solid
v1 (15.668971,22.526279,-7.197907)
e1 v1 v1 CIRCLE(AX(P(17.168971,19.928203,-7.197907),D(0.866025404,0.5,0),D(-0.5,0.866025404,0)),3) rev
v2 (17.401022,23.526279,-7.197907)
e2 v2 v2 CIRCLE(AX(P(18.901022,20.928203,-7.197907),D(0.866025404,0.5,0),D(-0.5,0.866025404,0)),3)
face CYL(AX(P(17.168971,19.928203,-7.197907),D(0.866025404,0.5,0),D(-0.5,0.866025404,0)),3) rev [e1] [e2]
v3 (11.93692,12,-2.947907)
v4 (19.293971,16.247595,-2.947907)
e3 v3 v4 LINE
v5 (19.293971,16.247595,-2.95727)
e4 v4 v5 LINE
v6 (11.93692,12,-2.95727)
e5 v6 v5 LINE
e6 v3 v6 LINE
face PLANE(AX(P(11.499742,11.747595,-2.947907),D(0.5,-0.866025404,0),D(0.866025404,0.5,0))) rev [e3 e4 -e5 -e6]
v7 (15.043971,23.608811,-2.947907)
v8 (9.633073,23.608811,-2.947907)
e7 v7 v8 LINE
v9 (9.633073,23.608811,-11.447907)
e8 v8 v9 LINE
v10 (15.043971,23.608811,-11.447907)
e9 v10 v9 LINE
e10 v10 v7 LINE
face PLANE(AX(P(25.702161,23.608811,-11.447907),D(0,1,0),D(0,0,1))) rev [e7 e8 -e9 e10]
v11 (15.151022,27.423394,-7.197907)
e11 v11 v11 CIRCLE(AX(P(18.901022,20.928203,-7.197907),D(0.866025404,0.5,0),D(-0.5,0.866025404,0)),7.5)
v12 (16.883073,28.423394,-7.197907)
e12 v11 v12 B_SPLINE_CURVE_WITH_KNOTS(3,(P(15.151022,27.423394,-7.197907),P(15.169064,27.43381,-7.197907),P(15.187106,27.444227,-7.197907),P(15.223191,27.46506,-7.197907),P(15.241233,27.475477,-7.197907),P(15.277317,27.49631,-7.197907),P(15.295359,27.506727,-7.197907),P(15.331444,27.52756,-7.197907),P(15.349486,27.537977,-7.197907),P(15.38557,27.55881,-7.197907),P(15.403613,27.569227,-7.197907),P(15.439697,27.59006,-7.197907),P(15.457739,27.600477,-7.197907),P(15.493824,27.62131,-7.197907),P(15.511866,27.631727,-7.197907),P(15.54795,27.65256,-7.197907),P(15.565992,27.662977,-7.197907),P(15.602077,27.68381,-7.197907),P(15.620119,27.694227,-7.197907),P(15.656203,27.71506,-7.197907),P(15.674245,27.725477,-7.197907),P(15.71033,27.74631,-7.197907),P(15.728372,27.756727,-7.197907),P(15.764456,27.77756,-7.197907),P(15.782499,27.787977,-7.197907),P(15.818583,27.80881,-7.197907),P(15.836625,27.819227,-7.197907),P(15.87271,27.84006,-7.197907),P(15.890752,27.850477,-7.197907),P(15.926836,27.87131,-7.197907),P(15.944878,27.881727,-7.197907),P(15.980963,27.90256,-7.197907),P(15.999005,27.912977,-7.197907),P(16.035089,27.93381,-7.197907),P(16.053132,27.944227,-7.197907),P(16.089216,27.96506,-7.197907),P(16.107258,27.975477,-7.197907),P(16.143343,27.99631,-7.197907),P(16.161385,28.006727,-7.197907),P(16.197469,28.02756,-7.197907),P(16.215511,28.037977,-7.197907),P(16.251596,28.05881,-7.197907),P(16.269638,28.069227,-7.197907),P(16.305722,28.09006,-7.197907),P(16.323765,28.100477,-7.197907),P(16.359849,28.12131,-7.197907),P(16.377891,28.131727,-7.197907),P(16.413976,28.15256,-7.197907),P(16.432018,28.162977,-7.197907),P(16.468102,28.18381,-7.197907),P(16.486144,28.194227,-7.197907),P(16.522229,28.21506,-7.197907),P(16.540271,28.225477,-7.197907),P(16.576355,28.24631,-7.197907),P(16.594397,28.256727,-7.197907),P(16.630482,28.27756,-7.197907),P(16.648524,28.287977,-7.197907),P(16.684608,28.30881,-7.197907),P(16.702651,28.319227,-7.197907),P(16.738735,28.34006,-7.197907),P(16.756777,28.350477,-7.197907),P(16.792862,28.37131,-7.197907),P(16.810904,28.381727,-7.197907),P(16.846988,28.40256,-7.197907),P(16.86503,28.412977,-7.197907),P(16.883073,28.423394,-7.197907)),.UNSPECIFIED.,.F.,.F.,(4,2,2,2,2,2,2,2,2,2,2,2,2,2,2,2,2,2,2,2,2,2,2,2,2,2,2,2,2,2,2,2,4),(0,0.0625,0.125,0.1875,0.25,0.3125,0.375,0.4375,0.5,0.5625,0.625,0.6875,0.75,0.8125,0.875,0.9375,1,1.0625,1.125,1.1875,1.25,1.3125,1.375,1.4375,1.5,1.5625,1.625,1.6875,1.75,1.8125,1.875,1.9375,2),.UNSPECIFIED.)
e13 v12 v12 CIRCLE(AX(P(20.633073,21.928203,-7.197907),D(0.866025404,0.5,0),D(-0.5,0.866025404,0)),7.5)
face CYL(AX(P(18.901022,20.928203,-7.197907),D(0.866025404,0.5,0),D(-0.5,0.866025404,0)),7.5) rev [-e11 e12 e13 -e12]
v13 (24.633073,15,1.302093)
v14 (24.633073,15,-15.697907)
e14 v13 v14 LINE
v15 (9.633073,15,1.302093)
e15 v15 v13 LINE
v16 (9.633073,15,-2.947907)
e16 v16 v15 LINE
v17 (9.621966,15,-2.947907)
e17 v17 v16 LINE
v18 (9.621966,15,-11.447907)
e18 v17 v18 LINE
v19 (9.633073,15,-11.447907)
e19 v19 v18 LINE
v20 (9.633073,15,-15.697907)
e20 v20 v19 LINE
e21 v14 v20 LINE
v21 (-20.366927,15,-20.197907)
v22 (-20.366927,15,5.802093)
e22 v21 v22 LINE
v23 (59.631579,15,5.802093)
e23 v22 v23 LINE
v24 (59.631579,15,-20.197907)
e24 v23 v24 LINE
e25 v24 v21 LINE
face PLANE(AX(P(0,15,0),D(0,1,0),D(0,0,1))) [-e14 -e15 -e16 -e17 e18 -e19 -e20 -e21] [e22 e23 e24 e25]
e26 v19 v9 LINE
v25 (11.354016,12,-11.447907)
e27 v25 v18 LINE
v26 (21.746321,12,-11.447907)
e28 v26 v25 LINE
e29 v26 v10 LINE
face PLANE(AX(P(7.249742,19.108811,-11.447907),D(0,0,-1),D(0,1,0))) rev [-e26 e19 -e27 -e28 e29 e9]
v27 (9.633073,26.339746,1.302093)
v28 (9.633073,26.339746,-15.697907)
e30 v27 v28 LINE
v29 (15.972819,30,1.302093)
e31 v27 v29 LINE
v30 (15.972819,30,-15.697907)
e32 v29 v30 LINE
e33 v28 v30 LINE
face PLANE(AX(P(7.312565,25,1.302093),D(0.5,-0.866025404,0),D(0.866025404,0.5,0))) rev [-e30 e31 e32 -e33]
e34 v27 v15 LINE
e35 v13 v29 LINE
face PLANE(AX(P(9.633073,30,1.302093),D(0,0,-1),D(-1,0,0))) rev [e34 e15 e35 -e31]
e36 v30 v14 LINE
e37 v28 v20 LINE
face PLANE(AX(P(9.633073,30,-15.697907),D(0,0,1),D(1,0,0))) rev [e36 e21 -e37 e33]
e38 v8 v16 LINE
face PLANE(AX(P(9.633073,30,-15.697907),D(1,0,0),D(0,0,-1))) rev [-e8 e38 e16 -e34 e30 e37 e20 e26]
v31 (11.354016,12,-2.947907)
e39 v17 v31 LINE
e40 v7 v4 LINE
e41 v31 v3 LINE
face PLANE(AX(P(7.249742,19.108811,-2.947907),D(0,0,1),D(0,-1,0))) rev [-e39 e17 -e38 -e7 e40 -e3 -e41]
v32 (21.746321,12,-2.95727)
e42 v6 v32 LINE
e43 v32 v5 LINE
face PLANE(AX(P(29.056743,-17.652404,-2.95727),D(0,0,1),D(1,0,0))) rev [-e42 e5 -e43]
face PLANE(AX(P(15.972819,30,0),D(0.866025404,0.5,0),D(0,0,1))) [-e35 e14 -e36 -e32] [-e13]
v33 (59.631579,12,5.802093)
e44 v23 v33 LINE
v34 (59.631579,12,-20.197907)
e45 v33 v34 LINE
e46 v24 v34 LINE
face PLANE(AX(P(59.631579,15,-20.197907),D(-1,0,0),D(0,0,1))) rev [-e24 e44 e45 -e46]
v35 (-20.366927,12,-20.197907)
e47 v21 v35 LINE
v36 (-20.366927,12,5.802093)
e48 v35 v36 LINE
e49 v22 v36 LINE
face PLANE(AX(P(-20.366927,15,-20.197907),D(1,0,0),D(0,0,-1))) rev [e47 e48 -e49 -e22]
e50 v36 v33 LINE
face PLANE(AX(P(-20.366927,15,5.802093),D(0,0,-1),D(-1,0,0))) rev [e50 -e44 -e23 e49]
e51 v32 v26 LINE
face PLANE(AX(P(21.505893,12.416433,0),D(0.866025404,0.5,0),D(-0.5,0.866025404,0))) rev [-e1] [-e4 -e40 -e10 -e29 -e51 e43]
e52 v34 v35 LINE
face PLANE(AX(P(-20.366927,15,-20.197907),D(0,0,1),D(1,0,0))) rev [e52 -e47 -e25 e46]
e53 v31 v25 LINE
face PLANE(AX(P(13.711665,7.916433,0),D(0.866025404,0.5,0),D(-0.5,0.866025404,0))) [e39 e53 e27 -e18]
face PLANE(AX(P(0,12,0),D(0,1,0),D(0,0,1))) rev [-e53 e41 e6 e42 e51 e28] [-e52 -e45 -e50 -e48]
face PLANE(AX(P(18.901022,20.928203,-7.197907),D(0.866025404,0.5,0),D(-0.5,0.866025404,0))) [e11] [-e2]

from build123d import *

# Parameters (mm, degrees)
ESBO_O1_R                  = 1.5
RESSALTO_EXTRUS_O1_DEPTH   = 12
RESSALTO_EXTRUS_O1_2_DEPTH = 12
ESBO_O1_R_2                = 1.500000005
RESSALTO_EXTRUS_O1_3_DEPTH = 12
RESSALTO_EXTRUS_O1_4_DEPTH = 12
RESSALTO_EXTRUS_O1_5_DEPTH = 12
RESSALTO_EXTRUS_O1_6_DEPTH = 12
ESBO_O1_R_3                = 1.500000003
RESSALTO_EXTRUS_O1_7_DEPTH = 12
RESSALTO_EXTRUS_O1_8_DEPTH = 12
ESBO_O2_W                  = 79.998506149
ESBO_O2_H                  = 25.999999951
RESSALTO_EXTRUS_O2_DEPTH   = 3
ESBO_O3_W                  = 15
ESBO_O3_H                  = 17
RESSALTO_EXTRUS_O3_DEPTH   = 15
CHANFRO1_START             = 28.832866647
CHANFRO1_OUTLINE_W         = 17.320508076
CHANFRO1_OUTLINE_H         = 17
CHANFRO1_DEPTH             = 8.167133353
ESBO_O4_R                  = 7.5
CORTE_EXTRUS_O3_DEPTH      = 2
ESBO_O5_R                  = 3
CORTE_EXTRUS_O4_DEPTH      = 2
ESBO_O6_W                  = 8.5
ESBO_O6_H                  = 8.5
CORTE_EXTRUS_O5_DEPTH      = 9
ESBO_O7_W                  = 8.495190528
ESBO_O7_H                  = 8.490637191
CORTE_EXTRUS_O6_DEPTH      = 71.124048339
CORTE_EXTRUS_O7_START      = 1
ESBO_O10_W                 = 32.298347435
ESBO_O10_H                 = 12
CORTE_EXTRUS_O7_DEPTH      = 102
CORTE_EXTRUS_O9_REACH      = 63.707
ESBO_O13_W                 = 8.5
ESBO_O13_H                 = 3.123983639
ESBO_O14_W                 = 17
ESBO_O14_H                 = 3.169872981
CORTE_EXTRUS_O10_DEPTH     = 10


with BuildPart() as part:
    # Esboço1 → Ressalto-extrusão1 (new body)
    with BuildSketch(Plane(origin=(0, 0, 0), x_dir=(1, 0, 0), z_dir=(0, 1, 0))):
        with Locations(Location((-18.866927397, -4.302093178, 0), (0, 0, 270))):
            Circle(ESBO_O1_R)
    extrude(amount=RESSALTO_EXTRUS_O1_DEPTH)



with BuildPart() as body_2:
    # Esboço1 → Ressalto-extrus_o1 2 (new body)
    with BuildSketch(Plane(origin=(0, 0, 0), x_dir=(1, 0, 0), z_dir=(0, 1, 0))):
        with Locations(Location((-18.868421246, 18.697906773, 0), (0, 0, 270))):
            Circle(ESBO_O1_R)
    extrude(amount=RESSALTO_EXTRUS_O1_2_DEPTH)


with BuildPart() as body_3:
    # Esboço1 → Ressalto-extrus_o1 3 (new body)
    with BuildSketch(Plane(origin=(0, 0, 0), x_dir=(1, 0, 0), z_dir=(0, 1, 0))):
        with Locations(Location((3.131578748, 18.697379942, 0), (0, 0, 270))):
            Circle(ESBO_O1_R_2)
    extrude(amount=RESSALTO_EXTRUS_O1_3_DEPTH)


with BuildPart() as body_4:
    # Esboço1 → Ressalto-extrus_o1 4 (new body)
    with BuildSketch(Plane(origin=(0, 0, 0), x_dir=(1, 0, 0), z_dir=(0, 1, 0))):
        with Locations(Location((3.133072603, -4.302620009, 0), (0, 0, 270))):
            Circle(ESBO_O1_R)
    extrude(amount=RESSALTO_EXTRUS_O1_4_DEPTH)


with BuildPart() as body_5:
    # Esboço1 → Ressalto-extrus_o1 5 (new body)
    with BuildSketch(Plane(origin=(0, 0, 0), x_dir=(1, 0, 0), z_dir=(0, 1, 0))):
        with Locations(Location((58.131578752, 18.697406939, 0), (0, 0, 270))):
            Circle(ESBO_O1_R)
    extrude(amount=RESSALTO_EXTRUS_O1_5_DEPTH)


with BuildPart() as body_6:
    # Esboço1 → Ressalto-extrus_o1 6 (new body)
    with BuildSketch(Plane(origin=(0, 0, 0), x_dir=(1, 0, 0), z_dir=(0, 1, 0))):
        with Locations(Location((58.131578752, -4.302593061, 0), (0, 0, 270))):
            Circle(ESBO_O1_R)
    extrude(amount=RESSALTO_EXTRUS_O1_6_DEPTH)


with BuildPart() as body_7:
    # Esboço1 → Ressalto-extrus_o1 7 (new body)
    with BuildSketch(Plane(origin=(0, 0, 0), x_dir=(1, 0, 0), z_dir=(0, 1, 0))):
        with Locations(Location((26.131578746, 18.696829164, 0), (0, 0, 270))):
            Circle(ESBO_O1_R_3)
    extrude(amount=RESSALTO_EXTRUS_O1_7_DEPTH)


with BuildPart() as body_8:
    # Esboço1 → Ressalto-extrus_o1 8 (new body)
    with BuildSketch(Plane(origin=(0, 0, 0), x_dir=(1, 0, 0), z_dir=(0, 1, 0))):
        with Locations(Location((26.133072603, -4.303170787, 0), (0, 0, 270))):
            Circle(ESBO_O1_R)
    extrude(amount=RESSALTO_EXTRUS_O1_8_DEPTH)


with BuildPart() as part_1:
    add(part.part)

    add(body_2.part)  # Ressalto-extrusão2 merges body 2

    add(body_3.part)  # Ressalto-extrusão2 merges body 3

    add(body_4.part)  # Ressalto-extrusão2 merges body 4

    add(body_5.part)  # Ressalto-extrusão2 merges body 5

    add(body_6.part)  # Ressalto-extrusão2 merges body 6

    add(body_7.part)  # Ressalto-extrusão2 merges body 7

    add(body_8.part)  # Ressalto-extrusão2 merges body 8
    # Esboço2 → Ressalto-extrusão2 (add)
    with BuildSketch(Plane(origin=(0, 12, 0), x_dir=(1, 0, 0), z_dir=(0, 1, 0))):
        with Locations((19.632325677, 7.197906797)):
            Rectangle(ESBO_O2_W, ESBO_O2_H)
    extrude(amount=RESSALTO_EXTRUS_O2_DEPTH)

    # Esboço3 → Ressalto-extrusão3 (add)
    with BuildSketch(Plane(origin=(0, 15, 0), x_dir=(1, 0, 0), z_dir=(0, 1, 0))):
        with Locations((17.133072603, 7.197906773)):
            Rectangle(ESBO_O3_W, ESBO_O3_H)
    extrude(amount=RESSALTO_EXTRUS_O3_DEPTH)

    # Chanfro1: read off the stored shape, not the designer's step
    # Chanfro1 outline → Chanfro1 (cut)
    with BuildSketch(Plane(origin=(0, 0, 0), x_dir=(0.49999999999999767, -0.86602540378444, 0), z_dir=(0.8660254037844399, 0.49999999999999795, 0)).offset(CHANFRO1_START)):
        with Locations((-9.334098793, 7.197906773)):
            Rectangle(CHANFRO1_OUTLINE_W, CHANFRO1_OUTLINE_H)
    extrude(amount=CHANFRO1_DEPTH, mode=Mode.SUBTRACT)

    # Esboço4 → Corte-extrusão3 (cut)
    with BuildSketch(Plane(origin=(24.96999498, 14.416433324, 0), x_dir=(0, 0, -1), z_dir=(0.8660254037844396, 0.4999999999999982, 0))):
        with Locations(Location((7.197906773, 8.673844755, 0), (0, 0, 90))):
            Circle(ESBO_O4_R)
    extrude(amount=-CORTE_EXTRUS_O3_DEPTH, mode=Mode.SUBTRACT)

    # Esboço5 → Corte-extrusão4 (cut)
    with BuildSketch(Plane(origin=(23.237944173, 13.416433324, 0), x_dir=(0, 0, -1), z_dir=(0.8660254037844398, 0.4999999999999983, 0))):
        with Locations(Location((7.197906773, 8.673844755, 0), (0, 0, 90))):
            Circle(ESBO_O5_R)
    extrude(amount=-CORTE_EXTRUS_O4_DEPTH, mode=Mode.SUBTRACT)

    # Esboço6 → Corte-extrusão5 (cut)
    with BuildSketch(Plane(origin=(21.505893365, 12.416433324, 0), x_dir=(0, 0, -1), z_dir=(0.8660254037844396, 0.49999999999999833, 0))):
        with Locations((7.197906773, 8.673844755)):
            Rectangle(ESBO_O6_W, ESBO_O6_H)
    extrude(amount=-CORTE_EXTRUS_O5_DEPTH, mode=Mode.SUBTRACT)

    # Esboço7 → Corte-extrusão6 (cut, through all)
    with BuildSketch(Plane(origin=(-2.211922378, 3.831161941, 0), x_dir=(0.8660254037844396, 0.49999999999999845, 0), z_dir=(-0.49999999999999845, 0.8660254037844396, 0))):
        with Locations((20.585271383, 7.202588178)):
            Rectangle(ESBO_O7_W, ESBO_O7_H)
    extrude(amount=-CORTE_EXTRUS_O6_DEPTH, mode=Mode.SUBTRACT)

    # Esboço10 → Corte-extrusão7 (cut)
    with BuildSketch(Plane.ZY.offset(20.366927397).offset(CORTE_EXTRUS_O7_START)):
        with Locations((-7.642594808, 6)):
            Rectangle(ESBO_O10_W, ESBO_O10_H)
    extrude(amount=-CORTE_EXTRUS_O7_DEPTH, mode=Mode.SUBTRACT)

    # Corte-extrusão9: up to this plane
    corte_extrus_o9_end = Plane(origin=(21.505893365, 12.416433324, 0), z_dir=(0.8660254037844397, 0.49999999999999806, 0))
    # Esboço13 → Corte-extrusão9 (cut, up to the surface)
    with BuildSketch(Plane.ZY.offset(-9.633072603), mode=Mode.PRIVATE) as corte_extrus_o9_sk1:
        with Locations((-7.197906773, 22.046819377)):
            Rectangle(ESBO_O13_W, ESBO_O13_H)
    corte_extrus_o9_tool1 = split(extrude(corte_extrus_o9_sk1.sketch, amount=-CORTE_EXTRUS_O9_REACH, mode=Mode.PRIVATE), bisect_by=corte_extrus_o9_end, keep=Keep.BOTH, mode=Mode.PRIVATE)
    add(corte_extrus_o9_tool1.solids().sort_by_distance((9.633073, 22.046819, -7.197907))[0], mode=Mode.SUBTRACT)

    # Esboço14 → Corte-extrusão10 (cut)
    with BuildSketch(Plane(origin=(24.96999498, 14.416433324, 0), x_dir=(0, 0, -1), z_dir=(0.8660254037844396, 0.4999999999999985, 0))):
        with Locations((7.197906773, 19.579289321)):
            Rectangle(ESBO_O14_W, ESBO_O14_H)
    extrude(amount=-CORTE_EXTRUS_O10_DEPTH, mode=Mode.SUBTRACT)


solid = part_1.part
